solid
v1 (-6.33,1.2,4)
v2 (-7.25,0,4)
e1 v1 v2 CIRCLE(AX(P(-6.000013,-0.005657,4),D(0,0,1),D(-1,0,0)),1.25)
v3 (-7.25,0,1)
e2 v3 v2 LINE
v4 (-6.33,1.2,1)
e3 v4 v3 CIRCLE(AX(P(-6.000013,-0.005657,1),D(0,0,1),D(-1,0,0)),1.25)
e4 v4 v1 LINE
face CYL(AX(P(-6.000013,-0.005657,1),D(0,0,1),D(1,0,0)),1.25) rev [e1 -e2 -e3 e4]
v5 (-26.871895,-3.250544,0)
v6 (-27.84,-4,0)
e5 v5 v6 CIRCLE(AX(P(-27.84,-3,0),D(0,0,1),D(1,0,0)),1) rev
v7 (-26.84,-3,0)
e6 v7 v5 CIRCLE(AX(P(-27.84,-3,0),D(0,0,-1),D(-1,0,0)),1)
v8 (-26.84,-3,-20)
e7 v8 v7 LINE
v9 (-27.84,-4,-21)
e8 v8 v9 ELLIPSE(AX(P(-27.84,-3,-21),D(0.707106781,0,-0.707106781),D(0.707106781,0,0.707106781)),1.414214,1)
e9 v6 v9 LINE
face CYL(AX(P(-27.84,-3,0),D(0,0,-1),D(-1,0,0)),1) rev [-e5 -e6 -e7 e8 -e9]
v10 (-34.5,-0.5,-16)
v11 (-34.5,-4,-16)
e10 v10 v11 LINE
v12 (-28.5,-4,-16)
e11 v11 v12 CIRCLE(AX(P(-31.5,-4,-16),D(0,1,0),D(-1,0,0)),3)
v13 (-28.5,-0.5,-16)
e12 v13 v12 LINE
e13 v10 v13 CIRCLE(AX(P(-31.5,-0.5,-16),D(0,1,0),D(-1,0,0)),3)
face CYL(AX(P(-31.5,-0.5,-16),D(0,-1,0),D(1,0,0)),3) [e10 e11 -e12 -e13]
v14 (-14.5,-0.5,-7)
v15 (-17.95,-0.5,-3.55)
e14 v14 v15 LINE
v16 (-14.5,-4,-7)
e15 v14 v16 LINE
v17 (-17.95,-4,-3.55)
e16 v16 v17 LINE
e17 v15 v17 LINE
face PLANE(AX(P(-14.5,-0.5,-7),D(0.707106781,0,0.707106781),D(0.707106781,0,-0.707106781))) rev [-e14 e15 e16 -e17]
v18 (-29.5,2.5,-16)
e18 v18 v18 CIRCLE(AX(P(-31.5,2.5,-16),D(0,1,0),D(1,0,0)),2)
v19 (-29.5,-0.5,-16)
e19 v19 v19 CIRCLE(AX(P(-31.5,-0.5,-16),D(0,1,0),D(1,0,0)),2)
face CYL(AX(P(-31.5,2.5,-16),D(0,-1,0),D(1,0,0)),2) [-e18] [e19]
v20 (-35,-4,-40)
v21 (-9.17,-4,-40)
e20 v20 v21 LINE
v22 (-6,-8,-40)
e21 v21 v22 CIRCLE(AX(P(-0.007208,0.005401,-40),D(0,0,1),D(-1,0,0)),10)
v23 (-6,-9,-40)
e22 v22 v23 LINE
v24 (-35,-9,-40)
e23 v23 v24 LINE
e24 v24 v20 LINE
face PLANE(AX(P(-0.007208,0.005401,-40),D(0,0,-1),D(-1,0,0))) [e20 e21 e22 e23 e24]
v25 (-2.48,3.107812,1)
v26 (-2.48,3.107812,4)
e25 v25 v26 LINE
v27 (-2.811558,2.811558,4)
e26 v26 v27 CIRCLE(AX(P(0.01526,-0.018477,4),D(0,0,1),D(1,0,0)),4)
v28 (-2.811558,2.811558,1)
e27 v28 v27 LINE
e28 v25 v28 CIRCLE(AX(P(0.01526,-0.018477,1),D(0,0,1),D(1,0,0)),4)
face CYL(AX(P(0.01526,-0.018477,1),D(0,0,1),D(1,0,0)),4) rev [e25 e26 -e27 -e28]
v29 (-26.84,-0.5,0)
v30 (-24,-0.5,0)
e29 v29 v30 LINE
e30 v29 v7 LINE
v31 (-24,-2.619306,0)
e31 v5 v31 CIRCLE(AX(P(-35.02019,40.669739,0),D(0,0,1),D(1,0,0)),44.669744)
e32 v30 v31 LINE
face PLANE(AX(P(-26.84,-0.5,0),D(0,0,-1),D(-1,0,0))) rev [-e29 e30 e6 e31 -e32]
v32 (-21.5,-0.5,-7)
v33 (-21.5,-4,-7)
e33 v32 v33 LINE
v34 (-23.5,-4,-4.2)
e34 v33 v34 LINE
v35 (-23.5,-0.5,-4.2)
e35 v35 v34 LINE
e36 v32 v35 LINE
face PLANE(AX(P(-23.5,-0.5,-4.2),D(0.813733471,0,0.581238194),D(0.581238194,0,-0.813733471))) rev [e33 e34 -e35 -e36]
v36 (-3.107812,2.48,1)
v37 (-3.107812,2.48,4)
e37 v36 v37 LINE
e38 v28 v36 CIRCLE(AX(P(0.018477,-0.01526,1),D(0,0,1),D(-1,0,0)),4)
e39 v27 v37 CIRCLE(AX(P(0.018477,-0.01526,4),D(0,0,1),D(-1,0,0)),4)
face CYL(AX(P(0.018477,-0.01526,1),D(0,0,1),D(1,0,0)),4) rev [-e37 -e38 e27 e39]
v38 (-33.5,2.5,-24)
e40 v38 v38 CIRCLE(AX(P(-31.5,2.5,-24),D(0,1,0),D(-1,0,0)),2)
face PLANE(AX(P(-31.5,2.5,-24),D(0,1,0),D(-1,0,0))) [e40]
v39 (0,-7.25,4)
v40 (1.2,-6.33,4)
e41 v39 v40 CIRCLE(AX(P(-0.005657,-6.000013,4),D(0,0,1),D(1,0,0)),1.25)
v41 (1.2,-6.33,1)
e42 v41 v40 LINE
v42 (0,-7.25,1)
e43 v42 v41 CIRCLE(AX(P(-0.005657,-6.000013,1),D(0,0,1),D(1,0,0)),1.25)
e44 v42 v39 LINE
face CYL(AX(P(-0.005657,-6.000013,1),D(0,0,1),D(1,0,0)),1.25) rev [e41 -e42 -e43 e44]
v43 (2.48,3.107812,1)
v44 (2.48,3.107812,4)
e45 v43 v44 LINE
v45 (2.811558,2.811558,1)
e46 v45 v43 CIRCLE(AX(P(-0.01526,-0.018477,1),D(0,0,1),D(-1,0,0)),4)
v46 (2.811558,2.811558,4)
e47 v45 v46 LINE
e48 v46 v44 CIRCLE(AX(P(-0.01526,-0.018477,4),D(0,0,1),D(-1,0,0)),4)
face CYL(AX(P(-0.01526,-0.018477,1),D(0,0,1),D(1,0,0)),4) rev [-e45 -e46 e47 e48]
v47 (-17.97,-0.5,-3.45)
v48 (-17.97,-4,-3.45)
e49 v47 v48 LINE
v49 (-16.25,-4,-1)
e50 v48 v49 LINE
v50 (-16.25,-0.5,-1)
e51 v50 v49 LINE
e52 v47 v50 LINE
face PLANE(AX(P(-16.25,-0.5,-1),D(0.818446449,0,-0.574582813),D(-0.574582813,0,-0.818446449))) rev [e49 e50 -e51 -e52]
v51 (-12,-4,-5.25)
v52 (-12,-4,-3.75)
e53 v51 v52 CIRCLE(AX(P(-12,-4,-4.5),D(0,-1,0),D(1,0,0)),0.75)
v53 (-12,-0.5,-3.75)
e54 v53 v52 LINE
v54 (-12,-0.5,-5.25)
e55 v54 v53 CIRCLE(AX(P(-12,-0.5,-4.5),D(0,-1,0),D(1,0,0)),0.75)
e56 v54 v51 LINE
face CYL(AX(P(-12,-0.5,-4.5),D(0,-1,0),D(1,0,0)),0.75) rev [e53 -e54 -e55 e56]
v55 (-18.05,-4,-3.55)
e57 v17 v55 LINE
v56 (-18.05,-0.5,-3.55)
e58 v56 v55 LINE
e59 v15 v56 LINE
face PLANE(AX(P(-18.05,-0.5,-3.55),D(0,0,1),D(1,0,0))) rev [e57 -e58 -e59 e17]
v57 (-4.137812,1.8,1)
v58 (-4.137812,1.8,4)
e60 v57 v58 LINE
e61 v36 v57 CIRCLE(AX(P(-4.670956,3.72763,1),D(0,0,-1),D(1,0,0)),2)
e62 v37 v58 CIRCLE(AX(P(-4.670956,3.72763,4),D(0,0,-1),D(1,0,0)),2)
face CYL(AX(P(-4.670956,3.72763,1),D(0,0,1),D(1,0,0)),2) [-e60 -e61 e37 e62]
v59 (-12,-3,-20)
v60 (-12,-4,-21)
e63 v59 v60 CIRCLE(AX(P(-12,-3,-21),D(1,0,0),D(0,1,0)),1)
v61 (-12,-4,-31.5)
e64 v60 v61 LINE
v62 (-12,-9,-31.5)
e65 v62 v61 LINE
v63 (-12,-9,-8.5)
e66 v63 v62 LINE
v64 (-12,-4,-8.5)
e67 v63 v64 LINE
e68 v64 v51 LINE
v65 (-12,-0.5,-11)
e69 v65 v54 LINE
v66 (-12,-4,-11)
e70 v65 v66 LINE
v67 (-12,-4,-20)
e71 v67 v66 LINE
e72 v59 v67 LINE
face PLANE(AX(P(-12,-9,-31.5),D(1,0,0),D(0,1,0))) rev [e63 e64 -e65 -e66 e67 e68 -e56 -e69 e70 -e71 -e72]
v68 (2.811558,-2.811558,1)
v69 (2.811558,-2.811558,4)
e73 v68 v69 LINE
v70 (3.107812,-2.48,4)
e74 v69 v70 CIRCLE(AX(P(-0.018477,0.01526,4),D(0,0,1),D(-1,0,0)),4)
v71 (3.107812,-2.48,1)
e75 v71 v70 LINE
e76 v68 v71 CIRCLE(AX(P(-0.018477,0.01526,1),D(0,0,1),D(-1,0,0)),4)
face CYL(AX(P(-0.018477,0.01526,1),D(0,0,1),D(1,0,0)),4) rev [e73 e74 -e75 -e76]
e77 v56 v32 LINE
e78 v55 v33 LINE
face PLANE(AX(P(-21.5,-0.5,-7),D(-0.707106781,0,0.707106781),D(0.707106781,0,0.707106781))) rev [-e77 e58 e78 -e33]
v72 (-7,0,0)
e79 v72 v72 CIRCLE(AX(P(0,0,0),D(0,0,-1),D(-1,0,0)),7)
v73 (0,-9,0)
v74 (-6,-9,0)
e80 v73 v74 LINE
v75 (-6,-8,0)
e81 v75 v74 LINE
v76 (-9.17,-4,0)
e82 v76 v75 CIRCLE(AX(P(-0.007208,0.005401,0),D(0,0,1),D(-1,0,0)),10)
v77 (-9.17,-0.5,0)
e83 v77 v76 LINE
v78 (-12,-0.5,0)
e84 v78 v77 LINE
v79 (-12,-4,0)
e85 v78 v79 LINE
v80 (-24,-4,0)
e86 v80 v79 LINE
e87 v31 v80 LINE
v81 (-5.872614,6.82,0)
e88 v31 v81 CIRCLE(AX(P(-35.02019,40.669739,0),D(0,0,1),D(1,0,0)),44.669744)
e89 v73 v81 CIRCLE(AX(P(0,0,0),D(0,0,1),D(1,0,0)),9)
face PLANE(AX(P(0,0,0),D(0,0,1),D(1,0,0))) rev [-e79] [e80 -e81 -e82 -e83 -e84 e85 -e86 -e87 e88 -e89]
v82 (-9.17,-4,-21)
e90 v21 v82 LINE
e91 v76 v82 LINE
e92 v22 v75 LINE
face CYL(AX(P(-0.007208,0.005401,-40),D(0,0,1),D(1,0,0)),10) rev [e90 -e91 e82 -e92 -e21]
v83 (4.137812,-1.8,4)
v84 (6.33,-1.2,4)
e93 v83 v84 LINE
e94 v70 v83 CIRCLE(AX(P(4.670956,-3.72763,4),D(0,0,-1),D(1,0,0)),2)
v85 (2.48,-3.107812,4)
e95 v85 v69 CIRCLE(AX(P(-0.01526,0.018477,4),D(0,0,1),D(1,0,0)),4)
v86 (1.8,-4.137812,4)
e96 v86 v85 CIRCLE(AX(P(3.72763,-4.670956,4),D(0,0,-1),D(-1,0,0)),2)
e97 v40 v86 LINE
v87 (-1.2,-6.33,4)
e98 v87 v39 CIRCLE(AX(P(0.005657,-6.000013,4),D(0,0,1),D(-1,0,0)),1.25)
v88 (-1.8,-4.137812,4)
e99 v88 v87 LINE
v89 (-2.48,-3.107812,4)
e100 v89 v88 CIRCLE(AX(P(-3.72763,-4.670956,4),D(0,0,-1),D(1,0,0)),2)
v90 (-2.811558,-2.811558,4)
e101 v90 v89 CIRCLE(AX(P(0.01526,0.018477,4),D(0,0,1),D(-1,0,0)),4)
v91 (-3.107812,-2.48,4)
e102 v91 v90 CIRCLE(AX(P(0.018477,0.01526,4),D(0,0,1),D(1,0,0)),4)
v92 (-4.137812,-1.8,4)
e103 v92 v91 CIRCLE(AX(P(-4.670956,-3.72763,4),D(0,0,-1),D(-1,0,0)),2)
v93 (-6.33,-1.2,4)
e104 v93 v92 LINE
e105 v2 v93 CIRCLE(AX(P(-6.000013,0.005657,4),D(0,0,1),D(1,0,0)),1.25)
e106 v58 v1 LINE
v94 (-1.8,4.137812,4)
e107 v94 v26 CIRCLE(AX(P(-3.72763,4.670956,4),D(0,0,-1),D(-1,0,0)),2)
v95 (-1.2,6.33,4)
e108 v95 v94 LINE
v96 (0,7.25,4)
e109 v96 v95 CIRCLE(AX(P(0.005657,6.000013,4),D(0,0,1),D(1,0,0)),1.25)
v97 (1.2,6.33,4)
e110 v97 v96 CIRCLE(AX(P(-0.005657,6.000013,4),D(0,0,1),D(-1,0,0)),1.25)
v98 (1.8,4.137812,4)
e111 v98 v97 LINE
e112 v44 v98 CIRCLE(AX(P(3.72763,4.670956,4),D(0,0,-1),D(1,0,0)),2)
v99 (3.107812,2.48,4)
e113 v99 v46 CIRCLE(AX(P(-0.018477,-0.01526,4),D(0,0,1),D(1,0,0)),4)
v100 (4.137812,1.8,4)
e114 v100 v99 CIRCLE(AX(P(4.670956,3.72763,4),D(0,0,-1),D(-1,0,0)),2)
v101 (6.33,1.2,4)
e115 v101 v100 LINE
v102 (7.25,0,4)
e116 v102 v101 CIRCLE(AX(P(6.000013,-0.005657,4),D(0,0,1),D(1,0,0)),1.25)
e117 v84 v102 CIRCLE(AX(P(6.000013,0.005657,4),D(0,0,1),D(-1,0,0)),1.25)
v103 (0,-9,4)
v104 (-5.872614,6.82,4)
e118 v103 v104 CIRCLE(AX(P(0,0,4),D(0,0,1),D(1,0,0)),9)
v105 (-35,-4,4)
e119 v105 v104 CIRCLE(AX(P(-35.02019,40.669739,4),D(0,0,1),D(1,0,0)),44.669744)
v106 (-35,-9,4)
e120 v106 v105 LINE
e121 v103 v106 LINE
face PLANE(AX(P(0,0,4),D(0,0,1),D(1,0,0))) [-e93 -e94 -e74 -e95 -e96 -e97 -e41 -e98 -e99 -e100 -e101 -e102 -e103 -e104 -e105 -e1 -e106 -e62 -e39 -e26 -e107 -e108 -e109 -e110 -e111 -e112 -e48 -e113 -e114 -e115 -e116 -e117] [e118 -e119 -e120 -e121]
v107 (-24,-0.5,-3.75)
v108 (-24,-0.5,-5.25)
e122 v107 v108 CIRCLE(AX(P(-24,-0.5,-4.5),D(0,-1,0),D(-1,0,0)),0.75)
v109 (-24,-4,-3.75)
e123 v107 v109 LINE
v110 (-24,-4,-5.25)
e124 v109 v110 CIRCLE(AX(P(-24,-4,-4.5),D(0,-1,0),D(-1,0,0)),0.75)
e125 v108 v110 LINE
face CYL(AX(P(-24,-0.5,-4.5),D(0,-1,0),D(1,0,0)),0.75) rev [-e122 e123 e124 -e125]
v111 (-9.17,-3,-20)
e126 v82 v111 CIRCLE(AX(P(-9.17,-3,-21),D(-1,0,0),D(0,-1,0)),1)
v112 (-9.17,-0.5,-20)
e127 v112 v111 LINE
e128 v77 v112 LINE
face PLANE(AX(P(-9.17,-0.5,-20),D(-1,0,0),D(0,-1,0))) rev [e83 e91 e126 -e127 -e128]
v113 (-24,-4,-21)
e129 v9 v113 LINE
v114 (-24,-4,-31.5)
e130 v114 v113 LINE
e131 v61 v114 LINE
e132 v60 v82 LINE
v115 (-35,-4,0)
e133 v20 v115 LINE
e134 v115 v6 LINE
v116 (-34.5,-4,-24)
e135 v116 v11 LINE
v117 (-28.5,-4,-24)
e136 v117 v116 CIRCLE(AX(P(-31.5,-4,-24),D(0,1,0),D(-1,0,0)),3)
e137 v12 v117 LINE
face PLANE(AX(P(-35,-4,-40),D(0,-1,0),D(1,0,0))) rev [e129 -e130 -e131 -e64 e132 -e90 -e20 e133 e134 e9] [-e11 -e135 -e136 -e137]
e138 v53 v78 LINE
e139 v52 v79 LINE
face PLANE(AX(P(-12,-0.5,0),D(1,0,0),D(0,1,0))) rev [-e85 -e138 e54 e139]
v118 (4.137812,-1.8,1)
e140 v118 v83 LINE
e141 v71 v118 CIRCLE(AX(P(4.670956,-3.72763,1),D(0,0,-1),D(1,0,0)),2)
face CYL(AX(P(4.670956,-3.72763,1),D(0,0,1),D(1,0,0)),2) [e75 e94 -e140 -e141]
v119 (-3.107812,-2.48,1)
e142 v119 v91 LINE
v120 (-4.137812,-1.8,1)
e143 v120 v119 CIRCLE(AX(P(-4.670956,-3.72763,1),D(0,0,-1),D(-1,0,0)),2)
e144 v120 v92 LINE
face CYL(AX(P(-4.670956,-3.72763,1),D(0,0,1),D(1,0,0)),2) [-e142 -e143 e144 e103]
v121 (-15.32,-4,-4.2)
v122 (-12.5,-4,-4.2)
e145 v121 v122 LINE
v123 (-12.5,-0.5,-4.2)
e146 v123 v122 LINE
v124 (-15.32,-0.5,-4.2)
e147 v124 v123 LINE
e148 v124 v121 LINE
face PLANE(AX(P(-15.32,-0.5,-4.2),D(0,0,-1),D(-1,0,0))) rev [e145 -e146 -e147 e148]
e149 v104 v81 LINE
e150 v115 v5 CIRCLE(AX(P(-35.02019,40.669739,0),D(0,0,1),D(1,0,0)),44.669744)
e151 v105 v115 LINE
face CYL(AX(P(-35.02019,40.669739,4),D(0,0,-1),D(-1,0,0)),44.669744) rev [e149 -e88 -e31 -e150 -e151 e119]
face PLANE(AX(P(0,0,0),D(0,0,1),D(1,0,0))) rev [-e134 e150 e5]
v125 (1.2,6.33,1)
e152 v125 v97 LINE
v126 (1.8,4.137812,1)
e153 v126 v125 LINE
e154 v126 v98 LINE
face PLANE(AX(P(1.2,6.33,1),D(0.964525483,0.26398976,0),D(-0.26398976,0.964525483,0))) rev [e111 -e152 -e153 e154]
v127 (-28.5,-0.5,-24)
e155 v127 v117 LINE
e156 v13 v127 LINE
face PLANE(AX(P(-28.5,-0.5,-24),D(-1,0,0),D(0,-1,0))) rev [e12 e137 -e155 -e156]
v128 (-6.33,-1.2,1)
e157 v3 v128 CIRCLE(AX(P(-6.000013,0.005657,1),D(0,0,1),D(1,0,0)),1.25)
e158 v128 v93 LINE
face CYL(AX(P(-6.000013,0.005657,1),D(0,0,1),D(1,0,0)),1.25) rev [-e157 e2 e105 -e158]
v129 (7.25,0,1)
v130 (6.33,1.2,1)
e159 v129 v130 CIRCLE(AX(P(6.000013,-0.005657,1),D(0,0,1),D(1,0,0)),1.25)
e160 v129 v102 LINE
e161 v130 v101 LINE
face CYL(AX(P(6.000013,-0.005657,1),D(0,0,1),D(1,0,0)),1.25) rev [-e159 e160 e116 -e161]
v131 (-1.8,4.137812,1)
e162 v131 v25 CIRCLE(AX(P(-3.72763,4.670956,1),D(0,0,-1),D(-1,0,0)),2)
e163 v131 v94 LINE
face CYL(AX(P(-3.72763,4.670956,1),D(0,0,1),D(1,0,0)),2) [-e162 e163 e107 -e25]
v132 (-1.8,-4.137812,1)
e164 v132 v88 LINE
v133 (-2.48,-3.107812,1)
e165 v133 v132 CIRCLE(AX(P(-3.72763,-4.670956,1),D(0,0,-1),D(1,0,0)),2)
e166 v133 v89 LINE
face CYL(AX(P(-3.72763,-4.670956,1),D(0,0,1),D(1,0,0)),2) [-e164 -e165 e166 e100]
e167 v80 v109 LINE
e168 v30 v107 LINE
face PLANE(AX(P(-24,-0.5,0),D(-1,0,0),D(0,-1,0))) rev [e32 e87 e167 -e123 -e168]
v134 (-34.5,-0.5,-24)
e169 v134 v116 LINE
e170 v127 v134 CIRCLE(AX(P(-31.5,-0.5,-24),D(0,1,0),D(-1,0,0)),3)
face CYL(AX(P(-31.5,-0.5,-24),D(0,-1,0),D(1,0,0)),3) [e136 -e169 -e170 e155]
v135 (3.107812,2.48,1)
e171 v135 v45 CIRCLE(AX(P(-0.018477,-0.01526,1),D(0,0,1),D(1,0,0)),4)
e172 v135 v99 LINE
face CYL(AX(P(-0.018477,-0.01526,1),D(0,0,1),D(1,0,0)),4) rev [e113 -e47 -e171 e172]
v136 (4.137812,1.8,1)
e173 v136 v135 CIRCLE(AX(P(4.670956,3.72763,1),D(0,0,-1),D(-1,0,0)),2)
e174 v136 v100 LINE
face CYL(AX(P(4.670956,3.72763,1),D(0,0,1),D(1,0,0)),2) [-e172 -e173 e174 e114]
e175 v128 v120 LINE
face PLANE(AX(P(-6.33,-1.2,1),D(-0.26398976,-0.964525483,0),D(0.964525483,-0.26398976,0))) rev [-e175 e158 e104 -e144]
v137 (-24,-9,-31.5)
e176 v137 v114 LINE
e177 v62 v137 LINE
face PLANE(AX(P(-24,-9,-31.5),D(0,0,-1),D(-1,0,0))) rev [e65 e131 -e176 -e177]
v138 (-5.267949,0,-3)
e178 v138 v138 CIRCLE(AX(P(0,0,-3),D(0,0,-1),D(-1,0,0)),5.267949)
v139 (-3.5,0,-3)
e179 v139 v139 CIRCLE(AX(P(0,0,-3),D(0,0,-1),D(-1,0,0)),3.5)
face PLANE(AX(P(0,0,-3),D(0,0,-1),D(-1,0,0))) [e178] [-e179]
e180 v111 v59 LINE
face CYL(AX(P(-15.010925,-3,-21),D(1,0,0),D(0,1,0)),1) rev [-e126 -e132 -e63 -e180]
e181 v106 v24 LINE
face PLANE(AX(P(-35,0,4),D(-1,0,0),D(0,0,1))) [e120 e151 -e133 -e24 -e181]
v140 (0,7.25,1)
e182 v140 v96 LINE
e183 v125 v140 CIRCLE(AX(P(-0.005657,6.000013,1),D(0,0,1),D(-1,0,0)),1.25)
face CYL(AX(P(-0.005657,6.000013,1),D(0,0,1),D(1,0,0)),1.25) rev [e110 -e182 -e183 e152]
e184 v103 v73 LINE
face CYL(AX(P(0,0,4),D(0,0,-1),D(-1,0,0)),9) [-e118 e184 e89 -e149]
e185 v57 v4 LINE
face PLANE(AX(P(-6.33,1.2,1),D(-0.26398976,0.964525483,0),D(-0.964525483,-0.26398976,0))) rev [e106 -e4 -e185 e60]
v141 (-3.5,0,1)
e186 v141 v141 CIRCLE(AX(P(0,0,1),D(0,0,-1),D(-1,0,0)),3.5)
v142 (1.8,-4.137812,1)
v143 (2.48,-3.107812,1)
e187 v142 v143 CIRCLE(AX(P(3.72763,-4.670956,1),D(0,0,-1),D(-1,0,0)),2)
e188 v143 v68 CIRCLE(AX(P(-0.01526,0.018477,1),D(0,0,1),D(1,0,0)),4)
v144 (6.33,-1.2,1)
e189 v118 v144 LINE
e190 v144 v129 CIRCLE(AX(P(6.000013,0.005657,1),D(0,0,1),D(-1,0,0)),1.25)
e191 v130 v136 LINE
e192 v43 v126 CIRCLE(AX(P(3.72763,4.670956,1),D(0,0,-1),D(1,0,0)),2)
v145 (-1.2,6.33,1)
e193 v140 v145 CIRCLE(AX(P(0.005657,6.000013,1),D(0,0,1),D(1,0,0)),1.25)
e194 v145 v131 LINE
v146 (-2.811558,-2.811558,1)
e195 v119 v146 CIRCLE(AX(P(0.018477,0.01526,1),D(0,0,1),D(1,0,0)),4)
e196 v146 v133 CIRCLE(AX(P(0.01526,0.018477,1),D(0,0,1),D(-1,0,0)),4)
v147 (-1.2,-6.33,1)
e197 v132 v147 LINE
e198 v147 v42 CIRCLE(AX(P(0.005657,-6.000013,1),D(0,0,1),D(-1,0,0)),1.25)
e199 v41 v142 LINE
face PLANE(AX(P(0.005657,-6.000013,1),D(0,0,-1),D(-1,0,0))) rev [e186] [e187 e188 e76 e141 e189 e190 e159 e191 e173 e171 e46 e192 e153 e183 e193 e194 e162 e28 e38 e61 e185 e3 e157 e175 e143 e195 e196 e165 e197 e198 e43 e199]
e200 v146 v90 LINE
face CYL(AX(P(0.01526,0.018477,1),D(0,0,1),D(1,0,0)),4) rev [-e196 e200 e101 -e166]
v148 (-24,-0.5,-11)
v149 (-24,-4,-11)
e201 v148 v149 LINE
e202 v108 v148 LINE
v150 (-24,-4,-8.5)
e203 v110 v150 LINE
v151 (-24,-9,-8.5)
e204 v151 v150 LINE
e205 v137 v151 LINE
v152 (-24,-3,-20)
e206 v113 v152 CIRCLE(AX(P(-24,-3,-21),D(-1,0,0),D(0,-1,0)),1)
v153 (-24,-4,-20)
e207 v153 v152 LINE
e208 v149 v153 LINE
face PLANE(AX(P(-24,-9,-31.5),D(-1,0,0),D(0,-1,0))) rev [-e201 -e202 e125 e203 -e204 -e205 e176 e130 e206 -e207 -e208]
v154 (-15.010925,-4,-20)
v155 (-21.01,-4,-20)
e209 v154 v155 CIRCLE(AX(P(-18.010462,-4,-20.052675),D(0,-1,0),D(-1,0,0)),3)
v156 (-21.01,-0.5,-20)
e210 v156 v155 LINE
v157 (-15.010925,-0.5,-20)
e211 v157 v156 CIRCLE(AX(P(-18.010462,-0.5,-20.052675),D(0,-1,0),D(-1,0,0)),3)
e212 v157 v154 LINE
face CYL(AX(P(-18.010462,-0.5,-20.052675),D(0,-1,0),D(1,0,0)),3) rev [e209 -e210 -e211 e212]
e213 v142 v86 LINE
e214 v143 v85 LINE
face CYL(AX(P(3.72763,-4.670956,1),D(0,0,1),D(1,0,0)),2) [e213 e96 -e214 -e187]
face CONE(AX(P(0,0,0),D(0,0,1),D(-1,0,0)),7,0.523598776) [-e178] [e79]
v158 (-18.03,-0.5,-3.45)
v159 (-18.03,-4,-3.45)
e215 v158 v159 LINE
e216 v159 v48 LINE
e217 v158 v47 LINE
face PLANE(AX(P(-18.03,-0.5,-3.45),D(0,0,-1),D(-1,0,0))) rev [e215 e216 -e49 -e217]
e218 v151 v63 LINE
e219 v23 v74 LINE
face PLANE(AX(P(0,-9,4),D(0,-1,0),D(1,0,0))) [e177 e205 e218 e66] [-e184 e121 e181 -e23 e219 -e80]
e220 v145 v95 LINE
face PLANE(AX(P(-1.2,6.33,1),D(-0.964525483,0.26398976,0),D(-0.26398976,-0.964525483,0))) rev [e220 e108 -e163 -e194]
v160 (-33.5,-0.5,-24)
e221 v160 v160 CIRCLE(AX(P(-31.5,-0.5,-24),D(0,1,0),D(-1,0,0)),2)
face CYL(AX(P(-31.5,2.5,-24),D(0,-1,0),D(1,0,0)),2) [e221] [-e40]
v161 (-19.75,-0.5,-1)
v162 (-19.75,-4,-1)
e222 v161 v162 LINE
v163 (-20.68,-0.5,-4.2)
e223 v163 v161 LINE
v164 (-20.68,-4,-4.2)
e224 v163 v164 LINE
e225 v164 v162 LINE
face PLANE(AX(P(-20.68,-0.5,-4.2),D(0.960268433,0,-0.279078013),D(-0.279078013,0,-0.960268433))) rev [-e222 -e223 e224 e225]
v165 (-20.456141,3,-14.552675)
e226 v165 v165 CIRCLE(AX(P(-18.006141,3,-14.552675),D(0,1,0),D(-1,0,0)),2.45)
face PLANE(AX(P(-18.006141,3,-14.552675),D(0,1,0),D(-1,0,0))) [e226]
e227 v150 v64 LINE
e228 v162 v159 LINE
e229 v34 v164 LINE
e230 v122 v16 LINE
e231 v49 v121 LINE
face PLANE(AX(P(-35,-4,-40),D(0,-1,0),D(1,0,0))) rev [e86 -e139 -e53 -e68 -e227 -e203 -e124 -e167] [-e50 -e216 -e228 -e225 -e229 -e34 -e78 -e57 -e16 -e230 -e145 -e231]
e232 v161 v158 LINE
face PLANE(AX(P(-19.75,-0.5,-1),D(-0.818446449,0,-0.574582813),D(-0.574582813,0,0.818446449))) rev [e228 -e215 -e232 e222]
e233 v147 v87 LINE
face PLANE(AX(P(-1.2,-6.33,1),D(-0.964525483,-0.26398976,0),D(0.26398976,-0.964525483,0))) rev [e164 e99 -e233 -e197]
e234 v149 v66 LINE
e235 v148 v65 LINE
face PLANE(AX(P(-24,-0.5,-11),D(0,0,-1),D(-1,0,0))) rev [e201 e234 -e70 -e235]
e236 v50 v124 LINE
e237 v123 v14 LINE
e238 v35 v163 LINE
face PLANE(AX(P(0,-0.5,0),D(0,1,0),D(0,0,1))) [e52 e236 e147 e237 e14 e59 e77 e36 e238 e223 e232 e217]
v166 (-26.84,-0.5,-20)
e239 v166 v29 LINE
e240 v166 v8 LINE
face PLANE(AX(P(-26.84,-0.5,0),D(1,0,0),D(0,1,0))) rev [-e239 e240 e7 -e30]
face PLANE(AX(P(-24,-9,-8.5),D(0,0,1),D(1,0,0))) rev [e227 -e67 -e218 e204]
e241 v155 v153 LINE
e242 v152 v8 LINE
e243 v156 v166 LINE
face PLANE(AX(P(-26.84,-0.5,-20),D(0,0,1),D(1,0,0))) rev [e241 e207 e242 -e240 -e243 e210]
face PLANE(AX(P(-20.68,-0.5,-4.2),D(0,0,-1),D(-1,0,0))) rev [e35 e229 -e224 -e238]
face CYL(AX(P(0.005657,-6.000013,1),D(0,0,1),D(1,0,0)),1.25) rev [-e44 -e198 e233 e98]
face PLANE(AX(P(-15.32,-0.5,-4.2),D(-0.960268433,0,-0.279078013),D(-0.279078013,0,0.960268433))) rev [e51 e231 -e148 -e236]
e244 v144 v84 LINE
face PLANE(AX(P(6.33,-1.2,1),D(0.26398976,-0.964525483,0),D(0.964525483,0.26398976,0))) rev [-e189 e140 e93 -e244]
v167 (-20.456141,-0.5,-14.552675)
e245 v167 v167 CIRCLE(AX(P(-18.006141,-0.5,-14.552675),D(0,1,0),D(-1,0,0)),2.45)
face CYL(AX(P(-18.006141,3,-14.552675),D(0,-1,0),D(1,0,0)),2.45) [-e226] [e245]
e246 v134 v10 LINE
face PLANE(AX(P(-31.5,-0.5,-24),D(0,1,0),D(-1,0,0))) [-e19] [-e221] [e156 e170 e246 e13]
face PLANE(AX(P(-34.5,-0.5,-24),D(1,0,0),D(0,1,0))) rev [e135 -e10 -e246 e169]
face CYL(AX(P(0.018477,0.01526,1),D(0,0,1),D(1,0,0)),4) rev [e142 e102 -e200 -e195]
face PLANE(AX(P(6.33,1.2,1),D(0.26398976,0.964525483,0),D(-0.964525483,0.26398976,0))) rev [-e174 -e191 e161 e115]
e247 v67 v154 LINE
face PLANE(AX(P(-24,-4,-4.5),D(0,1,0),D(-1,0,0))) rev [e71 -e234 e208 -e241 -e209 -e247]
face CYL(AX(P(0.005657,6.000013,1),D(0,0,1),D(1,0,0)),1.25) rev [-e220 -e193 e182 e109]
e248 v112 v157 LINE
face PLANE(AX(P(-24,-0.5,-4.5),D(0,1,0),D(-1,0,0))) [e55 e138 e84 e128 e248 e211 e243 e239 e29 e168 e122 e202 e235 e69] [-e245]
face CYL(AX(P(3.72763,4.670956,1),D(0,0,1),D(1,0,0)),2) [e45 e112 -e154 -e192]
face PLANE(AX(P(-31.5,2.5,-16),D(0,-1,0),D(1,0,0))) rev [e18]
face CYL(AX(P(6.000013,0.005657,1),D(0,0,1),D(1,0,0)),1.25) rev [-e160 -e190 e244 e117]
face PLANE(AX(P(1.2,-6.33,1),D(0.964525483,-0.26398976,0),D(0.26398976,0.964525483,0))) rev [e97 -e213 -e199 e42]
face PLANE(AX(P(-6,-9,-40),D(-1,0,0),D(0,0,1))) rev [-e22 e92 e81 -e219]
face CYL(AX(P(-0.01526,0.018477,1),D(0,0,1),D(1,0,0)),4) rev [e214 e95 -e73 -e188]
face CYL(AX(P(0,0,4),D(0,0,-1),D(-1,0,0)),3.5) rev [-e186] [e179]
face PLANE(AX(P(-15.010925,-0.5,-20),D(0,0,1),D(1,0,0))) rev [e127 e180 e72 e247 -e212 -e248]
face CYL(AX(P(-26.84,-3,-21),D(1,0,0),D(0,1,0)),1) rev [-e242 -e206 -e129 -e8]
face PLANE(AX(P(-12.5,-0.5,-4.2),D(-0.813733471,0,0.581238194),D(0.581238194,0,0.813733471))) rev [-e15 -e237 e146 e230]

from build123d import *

# Parameters (mm, degrees)
SKETCH1_R           = 9
BOSS_EXTRUDE1_DEPTH = 4
SKETCH2_R           = 7
BOSS_EXTRUDE2_DEPTH = 3
BOSS_EXTRUDE2_TAPER = 30
CUT_EXTRUDE1_DEPTH  = 3
BOSS_EXTRUDE3_DEPTH = 40
SKETCH6_W           = 12
SKETCH6_H           = 23
CUT_EXTRUDE2_DEPTH  = 55.717456081
BOSS_EXTRUDE4_DEPTH = 3.5
SKETCH8_R           = 2
BOSS_EXTRUDE5_DEPTH = 3
SKETCH9_R           = 3.5
CUT_EXTRUDE3_DEPTH  = 52.720402164
BOSS_EXTRUDE6_DEPTH = 3.5
SKETCH11_R          = 2.45
BOSS_EXTRUDE7_DEPTH = 3.5
BOSS_EXTRUDE8_DEPTH = 3.5
FILLET3_START       = -26.84
FILLET3_DEPTH       = 2.84
FILLET3_START_2     = -12
FILLET3_2_DEPTH     = 2.83
FILLET3_START_3     = -21
FILLET3_3_DEPTH     = 21
FILLET3_START_4     = -27.84
FILLET3_4_DEPTH     = 1


with BuildPart() as part:
    # Sketch1 → Boss-Extrude1 (new body)
    with BuildSketch(Plane.XY):
        with BuildLine():
            Line((-35, -9), (0, -9))
            ThreePointArc((0, -9), (-8.437416666, -3.132091953), (-5.872614409, 6.82))
            ThreePointArc((-5.872614409, 6.82), (-19.465199243, -1.204217751), (-35, -4))
            Line((-35, -4), (-35, -9))
        make_face()
        Circle(SKETCH1_R)
    extrude(amount=BOSS_EXTRUDE1_DEPTH)

    # Sketch2 → Boss-Extrude2 (add)
    with BuildSketch(Plane(origin=(0, 0, 0), x_dir=(-1, 0, 0), z_dir=(0, 0, -1))):
        Circle(SKETCH2_R)
    extrude(amount=BOSS_EXTRUDE2_DEPTH, taper=BOSS_EXTRUDE2_TAPER)

    # Sketch4 → Cut-Extrude1 (cut)
    with BuildSketch(Plane.XY.offset(4)):
        with BuildLine():
            Line((1.2, -6.33), (1.8, -4.1378116))
            ThreePointArc((1.8, -4.1378116), (2.058560194, -3.569045514), (2.48, -3.1078116))
            ThreePointArc((2.48, -3.1078116), (2.64989874, -2.964295475), (2.811558399, -2.811558399))
            ThreePointArc((2.811558399, -2.811558399), (2.964295475, -2.64989874), (3.1078116, -2.48))
            ThreePointArc((3.1078116, -2.48), (3.569045514, -2.058560194), (4.1378116, -1.8))
            Line((4.1378116, -1.8), (6.33, -1.2))
            ThreePointArc((6.33, -1.2), (6.992020752, -0.754882576), (7.25, 0))
            ThreePointArc((7.25, 0), (6.992020752, 0.754882576), (6.33, 1.2))
            Line((6.33, 1.2), (4.1378116, 1.8))
            ThreePointArc((4.1378116, 1.8), (3.569045514, 2.058560194), (3.1078116, 2.48))
            ThreePointArc((3.1078116, 2.48), (2.964295475, 2.64989874), (2.811558399, 2.811558399))
            ThreePointArc((2.811558399, 2.811558399), (2.64989874, 2.964295475), (2.48, 3.1078116))
            ThreePointArc((2.48, 3.1078116), (2.058560194, 3.569045514), (1.8, 4.1378116))
            Line((1.8, 4.1378116), (1.2, 6.33))
            ThreePointArc((1.2, 6.33), (0.754882576, 6.992020752), (0, 7.25))
            ThreePointArc((0, 7.25), (-0.754882576, 6.992020752), (-1.2, 6.33))
            Line((-1.2, 6.33), (-1.8, 4.1378116))
            ThreePointArc((-1.8, 4.1378116), (-2.058560194, 3.569045514), (-2.48, 3.1078116))
            ThreePointArc((-2.48, 3.1078116), (-2.64989874, 2.964295475), (-2.811558399, 2.811558399))
            ThreePointArc((-2.811558399, 2.811558399), (-2.964295475, 2.64989874), (-3.1078116, 2.48))
            ThreePointArc((-3.1078116, 2.48), (-3.569045514, 2.058560194), (-4.1378116, 1.8))
            Line((-4.1378116, 1.8), (-6.33, 1.2))
            ThreePointArc((-6.33, 1.2), (-6.992020752, 0.754882576), (-7.25, 0))
            ThreePointArc((-7.25, 0), (-6.992020752, -0.754882576), (-6.33, -1.2))
            Line((-6.33, -1.2), (-4.1378116, -1.8))
            ThreePointArc((-4.1378116, -1.8), (-3.569045514, -2.058560194), (-3.1078116, -2.48))
            ThreePointArc((-3.1078116, -2.48), (-2.964295475, -2.64989874), (-2.811558399, -2.811558399))
            ThreePointArc((-2.811558399, -2.811558399), (-2.64989874, -2.964295475), (-2.48, -3.1078116))
            ThreePointArc((-2.48, -3.1078116), (-2.058560194, -3.569045514), (-1.8, -4.1378116))
            Line((-1.8, -4.1378116), (-1.2, -6.33))
            ThreePointArc((-1.2, -6.33), (-0.754882576, -6.992020752), (0, -7.25))
            ThreePointArc((0, -7.25), (0.754882576, -6.992020752), (1.2, -6.33))
        make_face()
    extrude(amount=-CUT_EXTRUDE1_DEPTH, mode=Mode.SUBTRACT)

    # Sketch5 → Boss-Extrude3 (add)
    with BuildSketch(Plane(origin=(0, 0, 0), x_dir=(-1, 0, 0), z_dir=(0, 0, -1))):
        with BuildLine():
            Line((35, -9), (35, -4))
            Line((35, -4), (9.17, -4))
            ThreePointArc((9.17, -4), (7.844486312, -6.205642902), (6, -8))
            Line((6, -8), (6, -9))
            Line((6, -9), (35, -9))
        make_face()
    extrude(amount=BOSS_EXTRUDE3_DEPTH)

    # Sketch6 → Cut-Extrude2 (cut, through all)
    with BuildSketch(Plane(origin=(0, -4, 0), x_dir=(1, 0, 0), z_dir=(0, 1, 0))):
        with Locations((-18, 20)):
            Rectangle(SKETCH6_W, SKETCH6_H)
    extrude(amount=-CUT_EXTRUDE2_DEPTH, mode=Mode.SUBTRACT)

    # Sketch7 → Boss-Extrude4 (add)
    with BuildSketch(Plane(origin=(0, -4, 0), x_dir=(1, 0, 0), z_dir=(0, 1, 0))):
        with BuildLine():
            Line((-28.5, 24), (-28.5, 16))
            ThreePointArc((-28.5, 16), (-31.5, 13), (-34.5, 16))
            Line((-34.5, 16), (-34.5, 24))
            ThreePointArc((-34.5, 24), (-31.5, 27), (-28.5, 24))
        make_face()
    extrude(amount=BOSS_EXTRUDE4_DEPTH)

    # Sketch8 → Boss-Extrude5 (add)
    with BuildSketch(Plane(origin=(0, -0.5, 0), x_dir=(1, 0, 0), z_dir=(0, 1, 0))):
        with Locations(Location((-31.5, 24, 0), (0, 0, 180))):
            Circle(SKETCH8_R)
        with Locations((-31.5, 16)):
            Circle(SKETCH8_R)
    extrude(amount=BOSS_EXTRUDE5_DEPTH)

    # Sketch9 → Cut-Extrude3 (cut, through all)
    with BuildSketch(Plane(origin=(0, 0, -3), x_dir=(-1, 0, 0), z_dir=(0, 0, -1))):
        Circle(SKETCH9_R)
    extrude(amount=-CUT_EXTRUDE3_DEPTH, mode=Mode.SUBTRACT)

    # Sketch10 → Boss-Extrude6 (add)
    with BuildSketch(Plane(origin=(0, -4, 0), x_dir=(1, 0, 0), z_dir=(0, 1, 0))):
        with BuildLine():
            Line((-26.84, 0), (-26.84, 20))
            Line((-26.84, 20), (-21.01, 20))
            ThreePointArc((-21.01, 20), (-18.010462475, 17.05267484), (-15.010924951, 20))
            Line((-15.010924951, 20), (-9.17, 20))
            Line((-9.17, 20), (-9.17, 0))
            Line((-9.17, 0), (-12, 0))
            Line((-12, 0), (-12, 3.75))
            ThreePointArc((-12, 3.75), (-11.25, 4.5), (-12, 5.25))
            Line((-12, 5.25), (-12, 11))
            Line((-12, 11), (-24, 11))
            Line((-24, 11), (-24, 5.25))
            ThreePointArc((-24, 5.25), (-24.75, 4.5), (-24, 3.75))
            Line((-24, 3.75), (-24, 0))
            Line((-24, 0), (-26.84, 0))
        make_face()
    extrude(amount=BOSS_EXTRUDE6_DEPTH)

    # Sketch11 → Boss-Extrude7 (add)
    with BuildSketch(Plane(origin=(0, -0.5, 0), x_dir=(1, 0, 0), z_dir=(0, 1, 0))):
        with Locations(Location((-18.006141049, 14.55267484, 0), (0, 0, 180))):
            Circle(SKETCH11_R)
    extrude(amount=BOSS_EXTRUDE7_DEPTH)

    # Sketch12 → Boss-Extrude8 (add)
    with BuildSketch(Plane(origin=(0, -4, 0), x_dir=(1, 0, 0), z_dir=(0, 1, 0))):
        Polygon((-20.68, 4.2), (-23.5, 4.2), (-21.5, 7), (-18.05, 3.55), (-17.95, 3.55), (-14.5, 7), (-12.5, 4.2), (-15.32, 4.2), (-16.25, 1), (-17.97, 3.45), (-18.03, 3.45), (-19.75, 1), align=None)
    extrude(amount=BOSS_EXTRUDE8_DEPTH)

    # Fillet3: read off the stored shape, not the designer's step
    # Fillet3 outline → Fillet3 (add)
    with BuildSketch(Plane.YZ.offset(FILLET3_START)):
        with BuildLine():
            ThreePointArc((-4, -21), (-3.707106781, -20.292893219), (-3, -20))
            Line((-3, -20), (-4, -20))
            Line((-4, -20), (-4, -21))
        make_face()
    extrude(amount=FILLET3_DEPTH)

    # Fillet3 2 outline → Fillet3 2 (add)
    with BuildSketch(Plane.YZ.offset(FILLET3_START_2)):
        with BuildLine():
            ThreePointArc((-4, -21), (-3.707106781, -20.292893219), (-3, -20))
            Line((-3, -20), (-4, -20))
            Line((-4, -20), (-4, -21))
        make_face()
    extrude(amount=FILLET3_2_DEPTH)

    # Fillet3 3 outline → Fillet3 3 (add)
    with BuildSketch(Plane.XY.offset(FILLET3_START_3)):
        with BuildLine():
            Line((-26.84, -4), (-26.84, -3))
            ThreePointArc((-26.84, -3), (-27.132893219, -3.707106781), (-27.84, -4))
            Line((-27.84, -4), (-26.84, -4))
        make_face()
    extrude(amount=FILLET3_3_DEPTH)

    # Fillet3 4 outline → Fillet3 4 (cut)
    with BuildSketch(Plane.YZ.offset(FILLET3_START_4)):
        with BuildLine():
            Line((-2, -19.999999999), (-3, -20))
            ThreePointArc((-3, -20), (-3.707106781, -20.292893219), (-4, -21))
            Line((-4, -21), (-2, -21))
            Line((-2, -21), (-2, -19.999999999))
        make_face()
    extrude(amount=FILLET3_4_DEPTH, mode=Mode.SUBTRACT)


solid = part.part
